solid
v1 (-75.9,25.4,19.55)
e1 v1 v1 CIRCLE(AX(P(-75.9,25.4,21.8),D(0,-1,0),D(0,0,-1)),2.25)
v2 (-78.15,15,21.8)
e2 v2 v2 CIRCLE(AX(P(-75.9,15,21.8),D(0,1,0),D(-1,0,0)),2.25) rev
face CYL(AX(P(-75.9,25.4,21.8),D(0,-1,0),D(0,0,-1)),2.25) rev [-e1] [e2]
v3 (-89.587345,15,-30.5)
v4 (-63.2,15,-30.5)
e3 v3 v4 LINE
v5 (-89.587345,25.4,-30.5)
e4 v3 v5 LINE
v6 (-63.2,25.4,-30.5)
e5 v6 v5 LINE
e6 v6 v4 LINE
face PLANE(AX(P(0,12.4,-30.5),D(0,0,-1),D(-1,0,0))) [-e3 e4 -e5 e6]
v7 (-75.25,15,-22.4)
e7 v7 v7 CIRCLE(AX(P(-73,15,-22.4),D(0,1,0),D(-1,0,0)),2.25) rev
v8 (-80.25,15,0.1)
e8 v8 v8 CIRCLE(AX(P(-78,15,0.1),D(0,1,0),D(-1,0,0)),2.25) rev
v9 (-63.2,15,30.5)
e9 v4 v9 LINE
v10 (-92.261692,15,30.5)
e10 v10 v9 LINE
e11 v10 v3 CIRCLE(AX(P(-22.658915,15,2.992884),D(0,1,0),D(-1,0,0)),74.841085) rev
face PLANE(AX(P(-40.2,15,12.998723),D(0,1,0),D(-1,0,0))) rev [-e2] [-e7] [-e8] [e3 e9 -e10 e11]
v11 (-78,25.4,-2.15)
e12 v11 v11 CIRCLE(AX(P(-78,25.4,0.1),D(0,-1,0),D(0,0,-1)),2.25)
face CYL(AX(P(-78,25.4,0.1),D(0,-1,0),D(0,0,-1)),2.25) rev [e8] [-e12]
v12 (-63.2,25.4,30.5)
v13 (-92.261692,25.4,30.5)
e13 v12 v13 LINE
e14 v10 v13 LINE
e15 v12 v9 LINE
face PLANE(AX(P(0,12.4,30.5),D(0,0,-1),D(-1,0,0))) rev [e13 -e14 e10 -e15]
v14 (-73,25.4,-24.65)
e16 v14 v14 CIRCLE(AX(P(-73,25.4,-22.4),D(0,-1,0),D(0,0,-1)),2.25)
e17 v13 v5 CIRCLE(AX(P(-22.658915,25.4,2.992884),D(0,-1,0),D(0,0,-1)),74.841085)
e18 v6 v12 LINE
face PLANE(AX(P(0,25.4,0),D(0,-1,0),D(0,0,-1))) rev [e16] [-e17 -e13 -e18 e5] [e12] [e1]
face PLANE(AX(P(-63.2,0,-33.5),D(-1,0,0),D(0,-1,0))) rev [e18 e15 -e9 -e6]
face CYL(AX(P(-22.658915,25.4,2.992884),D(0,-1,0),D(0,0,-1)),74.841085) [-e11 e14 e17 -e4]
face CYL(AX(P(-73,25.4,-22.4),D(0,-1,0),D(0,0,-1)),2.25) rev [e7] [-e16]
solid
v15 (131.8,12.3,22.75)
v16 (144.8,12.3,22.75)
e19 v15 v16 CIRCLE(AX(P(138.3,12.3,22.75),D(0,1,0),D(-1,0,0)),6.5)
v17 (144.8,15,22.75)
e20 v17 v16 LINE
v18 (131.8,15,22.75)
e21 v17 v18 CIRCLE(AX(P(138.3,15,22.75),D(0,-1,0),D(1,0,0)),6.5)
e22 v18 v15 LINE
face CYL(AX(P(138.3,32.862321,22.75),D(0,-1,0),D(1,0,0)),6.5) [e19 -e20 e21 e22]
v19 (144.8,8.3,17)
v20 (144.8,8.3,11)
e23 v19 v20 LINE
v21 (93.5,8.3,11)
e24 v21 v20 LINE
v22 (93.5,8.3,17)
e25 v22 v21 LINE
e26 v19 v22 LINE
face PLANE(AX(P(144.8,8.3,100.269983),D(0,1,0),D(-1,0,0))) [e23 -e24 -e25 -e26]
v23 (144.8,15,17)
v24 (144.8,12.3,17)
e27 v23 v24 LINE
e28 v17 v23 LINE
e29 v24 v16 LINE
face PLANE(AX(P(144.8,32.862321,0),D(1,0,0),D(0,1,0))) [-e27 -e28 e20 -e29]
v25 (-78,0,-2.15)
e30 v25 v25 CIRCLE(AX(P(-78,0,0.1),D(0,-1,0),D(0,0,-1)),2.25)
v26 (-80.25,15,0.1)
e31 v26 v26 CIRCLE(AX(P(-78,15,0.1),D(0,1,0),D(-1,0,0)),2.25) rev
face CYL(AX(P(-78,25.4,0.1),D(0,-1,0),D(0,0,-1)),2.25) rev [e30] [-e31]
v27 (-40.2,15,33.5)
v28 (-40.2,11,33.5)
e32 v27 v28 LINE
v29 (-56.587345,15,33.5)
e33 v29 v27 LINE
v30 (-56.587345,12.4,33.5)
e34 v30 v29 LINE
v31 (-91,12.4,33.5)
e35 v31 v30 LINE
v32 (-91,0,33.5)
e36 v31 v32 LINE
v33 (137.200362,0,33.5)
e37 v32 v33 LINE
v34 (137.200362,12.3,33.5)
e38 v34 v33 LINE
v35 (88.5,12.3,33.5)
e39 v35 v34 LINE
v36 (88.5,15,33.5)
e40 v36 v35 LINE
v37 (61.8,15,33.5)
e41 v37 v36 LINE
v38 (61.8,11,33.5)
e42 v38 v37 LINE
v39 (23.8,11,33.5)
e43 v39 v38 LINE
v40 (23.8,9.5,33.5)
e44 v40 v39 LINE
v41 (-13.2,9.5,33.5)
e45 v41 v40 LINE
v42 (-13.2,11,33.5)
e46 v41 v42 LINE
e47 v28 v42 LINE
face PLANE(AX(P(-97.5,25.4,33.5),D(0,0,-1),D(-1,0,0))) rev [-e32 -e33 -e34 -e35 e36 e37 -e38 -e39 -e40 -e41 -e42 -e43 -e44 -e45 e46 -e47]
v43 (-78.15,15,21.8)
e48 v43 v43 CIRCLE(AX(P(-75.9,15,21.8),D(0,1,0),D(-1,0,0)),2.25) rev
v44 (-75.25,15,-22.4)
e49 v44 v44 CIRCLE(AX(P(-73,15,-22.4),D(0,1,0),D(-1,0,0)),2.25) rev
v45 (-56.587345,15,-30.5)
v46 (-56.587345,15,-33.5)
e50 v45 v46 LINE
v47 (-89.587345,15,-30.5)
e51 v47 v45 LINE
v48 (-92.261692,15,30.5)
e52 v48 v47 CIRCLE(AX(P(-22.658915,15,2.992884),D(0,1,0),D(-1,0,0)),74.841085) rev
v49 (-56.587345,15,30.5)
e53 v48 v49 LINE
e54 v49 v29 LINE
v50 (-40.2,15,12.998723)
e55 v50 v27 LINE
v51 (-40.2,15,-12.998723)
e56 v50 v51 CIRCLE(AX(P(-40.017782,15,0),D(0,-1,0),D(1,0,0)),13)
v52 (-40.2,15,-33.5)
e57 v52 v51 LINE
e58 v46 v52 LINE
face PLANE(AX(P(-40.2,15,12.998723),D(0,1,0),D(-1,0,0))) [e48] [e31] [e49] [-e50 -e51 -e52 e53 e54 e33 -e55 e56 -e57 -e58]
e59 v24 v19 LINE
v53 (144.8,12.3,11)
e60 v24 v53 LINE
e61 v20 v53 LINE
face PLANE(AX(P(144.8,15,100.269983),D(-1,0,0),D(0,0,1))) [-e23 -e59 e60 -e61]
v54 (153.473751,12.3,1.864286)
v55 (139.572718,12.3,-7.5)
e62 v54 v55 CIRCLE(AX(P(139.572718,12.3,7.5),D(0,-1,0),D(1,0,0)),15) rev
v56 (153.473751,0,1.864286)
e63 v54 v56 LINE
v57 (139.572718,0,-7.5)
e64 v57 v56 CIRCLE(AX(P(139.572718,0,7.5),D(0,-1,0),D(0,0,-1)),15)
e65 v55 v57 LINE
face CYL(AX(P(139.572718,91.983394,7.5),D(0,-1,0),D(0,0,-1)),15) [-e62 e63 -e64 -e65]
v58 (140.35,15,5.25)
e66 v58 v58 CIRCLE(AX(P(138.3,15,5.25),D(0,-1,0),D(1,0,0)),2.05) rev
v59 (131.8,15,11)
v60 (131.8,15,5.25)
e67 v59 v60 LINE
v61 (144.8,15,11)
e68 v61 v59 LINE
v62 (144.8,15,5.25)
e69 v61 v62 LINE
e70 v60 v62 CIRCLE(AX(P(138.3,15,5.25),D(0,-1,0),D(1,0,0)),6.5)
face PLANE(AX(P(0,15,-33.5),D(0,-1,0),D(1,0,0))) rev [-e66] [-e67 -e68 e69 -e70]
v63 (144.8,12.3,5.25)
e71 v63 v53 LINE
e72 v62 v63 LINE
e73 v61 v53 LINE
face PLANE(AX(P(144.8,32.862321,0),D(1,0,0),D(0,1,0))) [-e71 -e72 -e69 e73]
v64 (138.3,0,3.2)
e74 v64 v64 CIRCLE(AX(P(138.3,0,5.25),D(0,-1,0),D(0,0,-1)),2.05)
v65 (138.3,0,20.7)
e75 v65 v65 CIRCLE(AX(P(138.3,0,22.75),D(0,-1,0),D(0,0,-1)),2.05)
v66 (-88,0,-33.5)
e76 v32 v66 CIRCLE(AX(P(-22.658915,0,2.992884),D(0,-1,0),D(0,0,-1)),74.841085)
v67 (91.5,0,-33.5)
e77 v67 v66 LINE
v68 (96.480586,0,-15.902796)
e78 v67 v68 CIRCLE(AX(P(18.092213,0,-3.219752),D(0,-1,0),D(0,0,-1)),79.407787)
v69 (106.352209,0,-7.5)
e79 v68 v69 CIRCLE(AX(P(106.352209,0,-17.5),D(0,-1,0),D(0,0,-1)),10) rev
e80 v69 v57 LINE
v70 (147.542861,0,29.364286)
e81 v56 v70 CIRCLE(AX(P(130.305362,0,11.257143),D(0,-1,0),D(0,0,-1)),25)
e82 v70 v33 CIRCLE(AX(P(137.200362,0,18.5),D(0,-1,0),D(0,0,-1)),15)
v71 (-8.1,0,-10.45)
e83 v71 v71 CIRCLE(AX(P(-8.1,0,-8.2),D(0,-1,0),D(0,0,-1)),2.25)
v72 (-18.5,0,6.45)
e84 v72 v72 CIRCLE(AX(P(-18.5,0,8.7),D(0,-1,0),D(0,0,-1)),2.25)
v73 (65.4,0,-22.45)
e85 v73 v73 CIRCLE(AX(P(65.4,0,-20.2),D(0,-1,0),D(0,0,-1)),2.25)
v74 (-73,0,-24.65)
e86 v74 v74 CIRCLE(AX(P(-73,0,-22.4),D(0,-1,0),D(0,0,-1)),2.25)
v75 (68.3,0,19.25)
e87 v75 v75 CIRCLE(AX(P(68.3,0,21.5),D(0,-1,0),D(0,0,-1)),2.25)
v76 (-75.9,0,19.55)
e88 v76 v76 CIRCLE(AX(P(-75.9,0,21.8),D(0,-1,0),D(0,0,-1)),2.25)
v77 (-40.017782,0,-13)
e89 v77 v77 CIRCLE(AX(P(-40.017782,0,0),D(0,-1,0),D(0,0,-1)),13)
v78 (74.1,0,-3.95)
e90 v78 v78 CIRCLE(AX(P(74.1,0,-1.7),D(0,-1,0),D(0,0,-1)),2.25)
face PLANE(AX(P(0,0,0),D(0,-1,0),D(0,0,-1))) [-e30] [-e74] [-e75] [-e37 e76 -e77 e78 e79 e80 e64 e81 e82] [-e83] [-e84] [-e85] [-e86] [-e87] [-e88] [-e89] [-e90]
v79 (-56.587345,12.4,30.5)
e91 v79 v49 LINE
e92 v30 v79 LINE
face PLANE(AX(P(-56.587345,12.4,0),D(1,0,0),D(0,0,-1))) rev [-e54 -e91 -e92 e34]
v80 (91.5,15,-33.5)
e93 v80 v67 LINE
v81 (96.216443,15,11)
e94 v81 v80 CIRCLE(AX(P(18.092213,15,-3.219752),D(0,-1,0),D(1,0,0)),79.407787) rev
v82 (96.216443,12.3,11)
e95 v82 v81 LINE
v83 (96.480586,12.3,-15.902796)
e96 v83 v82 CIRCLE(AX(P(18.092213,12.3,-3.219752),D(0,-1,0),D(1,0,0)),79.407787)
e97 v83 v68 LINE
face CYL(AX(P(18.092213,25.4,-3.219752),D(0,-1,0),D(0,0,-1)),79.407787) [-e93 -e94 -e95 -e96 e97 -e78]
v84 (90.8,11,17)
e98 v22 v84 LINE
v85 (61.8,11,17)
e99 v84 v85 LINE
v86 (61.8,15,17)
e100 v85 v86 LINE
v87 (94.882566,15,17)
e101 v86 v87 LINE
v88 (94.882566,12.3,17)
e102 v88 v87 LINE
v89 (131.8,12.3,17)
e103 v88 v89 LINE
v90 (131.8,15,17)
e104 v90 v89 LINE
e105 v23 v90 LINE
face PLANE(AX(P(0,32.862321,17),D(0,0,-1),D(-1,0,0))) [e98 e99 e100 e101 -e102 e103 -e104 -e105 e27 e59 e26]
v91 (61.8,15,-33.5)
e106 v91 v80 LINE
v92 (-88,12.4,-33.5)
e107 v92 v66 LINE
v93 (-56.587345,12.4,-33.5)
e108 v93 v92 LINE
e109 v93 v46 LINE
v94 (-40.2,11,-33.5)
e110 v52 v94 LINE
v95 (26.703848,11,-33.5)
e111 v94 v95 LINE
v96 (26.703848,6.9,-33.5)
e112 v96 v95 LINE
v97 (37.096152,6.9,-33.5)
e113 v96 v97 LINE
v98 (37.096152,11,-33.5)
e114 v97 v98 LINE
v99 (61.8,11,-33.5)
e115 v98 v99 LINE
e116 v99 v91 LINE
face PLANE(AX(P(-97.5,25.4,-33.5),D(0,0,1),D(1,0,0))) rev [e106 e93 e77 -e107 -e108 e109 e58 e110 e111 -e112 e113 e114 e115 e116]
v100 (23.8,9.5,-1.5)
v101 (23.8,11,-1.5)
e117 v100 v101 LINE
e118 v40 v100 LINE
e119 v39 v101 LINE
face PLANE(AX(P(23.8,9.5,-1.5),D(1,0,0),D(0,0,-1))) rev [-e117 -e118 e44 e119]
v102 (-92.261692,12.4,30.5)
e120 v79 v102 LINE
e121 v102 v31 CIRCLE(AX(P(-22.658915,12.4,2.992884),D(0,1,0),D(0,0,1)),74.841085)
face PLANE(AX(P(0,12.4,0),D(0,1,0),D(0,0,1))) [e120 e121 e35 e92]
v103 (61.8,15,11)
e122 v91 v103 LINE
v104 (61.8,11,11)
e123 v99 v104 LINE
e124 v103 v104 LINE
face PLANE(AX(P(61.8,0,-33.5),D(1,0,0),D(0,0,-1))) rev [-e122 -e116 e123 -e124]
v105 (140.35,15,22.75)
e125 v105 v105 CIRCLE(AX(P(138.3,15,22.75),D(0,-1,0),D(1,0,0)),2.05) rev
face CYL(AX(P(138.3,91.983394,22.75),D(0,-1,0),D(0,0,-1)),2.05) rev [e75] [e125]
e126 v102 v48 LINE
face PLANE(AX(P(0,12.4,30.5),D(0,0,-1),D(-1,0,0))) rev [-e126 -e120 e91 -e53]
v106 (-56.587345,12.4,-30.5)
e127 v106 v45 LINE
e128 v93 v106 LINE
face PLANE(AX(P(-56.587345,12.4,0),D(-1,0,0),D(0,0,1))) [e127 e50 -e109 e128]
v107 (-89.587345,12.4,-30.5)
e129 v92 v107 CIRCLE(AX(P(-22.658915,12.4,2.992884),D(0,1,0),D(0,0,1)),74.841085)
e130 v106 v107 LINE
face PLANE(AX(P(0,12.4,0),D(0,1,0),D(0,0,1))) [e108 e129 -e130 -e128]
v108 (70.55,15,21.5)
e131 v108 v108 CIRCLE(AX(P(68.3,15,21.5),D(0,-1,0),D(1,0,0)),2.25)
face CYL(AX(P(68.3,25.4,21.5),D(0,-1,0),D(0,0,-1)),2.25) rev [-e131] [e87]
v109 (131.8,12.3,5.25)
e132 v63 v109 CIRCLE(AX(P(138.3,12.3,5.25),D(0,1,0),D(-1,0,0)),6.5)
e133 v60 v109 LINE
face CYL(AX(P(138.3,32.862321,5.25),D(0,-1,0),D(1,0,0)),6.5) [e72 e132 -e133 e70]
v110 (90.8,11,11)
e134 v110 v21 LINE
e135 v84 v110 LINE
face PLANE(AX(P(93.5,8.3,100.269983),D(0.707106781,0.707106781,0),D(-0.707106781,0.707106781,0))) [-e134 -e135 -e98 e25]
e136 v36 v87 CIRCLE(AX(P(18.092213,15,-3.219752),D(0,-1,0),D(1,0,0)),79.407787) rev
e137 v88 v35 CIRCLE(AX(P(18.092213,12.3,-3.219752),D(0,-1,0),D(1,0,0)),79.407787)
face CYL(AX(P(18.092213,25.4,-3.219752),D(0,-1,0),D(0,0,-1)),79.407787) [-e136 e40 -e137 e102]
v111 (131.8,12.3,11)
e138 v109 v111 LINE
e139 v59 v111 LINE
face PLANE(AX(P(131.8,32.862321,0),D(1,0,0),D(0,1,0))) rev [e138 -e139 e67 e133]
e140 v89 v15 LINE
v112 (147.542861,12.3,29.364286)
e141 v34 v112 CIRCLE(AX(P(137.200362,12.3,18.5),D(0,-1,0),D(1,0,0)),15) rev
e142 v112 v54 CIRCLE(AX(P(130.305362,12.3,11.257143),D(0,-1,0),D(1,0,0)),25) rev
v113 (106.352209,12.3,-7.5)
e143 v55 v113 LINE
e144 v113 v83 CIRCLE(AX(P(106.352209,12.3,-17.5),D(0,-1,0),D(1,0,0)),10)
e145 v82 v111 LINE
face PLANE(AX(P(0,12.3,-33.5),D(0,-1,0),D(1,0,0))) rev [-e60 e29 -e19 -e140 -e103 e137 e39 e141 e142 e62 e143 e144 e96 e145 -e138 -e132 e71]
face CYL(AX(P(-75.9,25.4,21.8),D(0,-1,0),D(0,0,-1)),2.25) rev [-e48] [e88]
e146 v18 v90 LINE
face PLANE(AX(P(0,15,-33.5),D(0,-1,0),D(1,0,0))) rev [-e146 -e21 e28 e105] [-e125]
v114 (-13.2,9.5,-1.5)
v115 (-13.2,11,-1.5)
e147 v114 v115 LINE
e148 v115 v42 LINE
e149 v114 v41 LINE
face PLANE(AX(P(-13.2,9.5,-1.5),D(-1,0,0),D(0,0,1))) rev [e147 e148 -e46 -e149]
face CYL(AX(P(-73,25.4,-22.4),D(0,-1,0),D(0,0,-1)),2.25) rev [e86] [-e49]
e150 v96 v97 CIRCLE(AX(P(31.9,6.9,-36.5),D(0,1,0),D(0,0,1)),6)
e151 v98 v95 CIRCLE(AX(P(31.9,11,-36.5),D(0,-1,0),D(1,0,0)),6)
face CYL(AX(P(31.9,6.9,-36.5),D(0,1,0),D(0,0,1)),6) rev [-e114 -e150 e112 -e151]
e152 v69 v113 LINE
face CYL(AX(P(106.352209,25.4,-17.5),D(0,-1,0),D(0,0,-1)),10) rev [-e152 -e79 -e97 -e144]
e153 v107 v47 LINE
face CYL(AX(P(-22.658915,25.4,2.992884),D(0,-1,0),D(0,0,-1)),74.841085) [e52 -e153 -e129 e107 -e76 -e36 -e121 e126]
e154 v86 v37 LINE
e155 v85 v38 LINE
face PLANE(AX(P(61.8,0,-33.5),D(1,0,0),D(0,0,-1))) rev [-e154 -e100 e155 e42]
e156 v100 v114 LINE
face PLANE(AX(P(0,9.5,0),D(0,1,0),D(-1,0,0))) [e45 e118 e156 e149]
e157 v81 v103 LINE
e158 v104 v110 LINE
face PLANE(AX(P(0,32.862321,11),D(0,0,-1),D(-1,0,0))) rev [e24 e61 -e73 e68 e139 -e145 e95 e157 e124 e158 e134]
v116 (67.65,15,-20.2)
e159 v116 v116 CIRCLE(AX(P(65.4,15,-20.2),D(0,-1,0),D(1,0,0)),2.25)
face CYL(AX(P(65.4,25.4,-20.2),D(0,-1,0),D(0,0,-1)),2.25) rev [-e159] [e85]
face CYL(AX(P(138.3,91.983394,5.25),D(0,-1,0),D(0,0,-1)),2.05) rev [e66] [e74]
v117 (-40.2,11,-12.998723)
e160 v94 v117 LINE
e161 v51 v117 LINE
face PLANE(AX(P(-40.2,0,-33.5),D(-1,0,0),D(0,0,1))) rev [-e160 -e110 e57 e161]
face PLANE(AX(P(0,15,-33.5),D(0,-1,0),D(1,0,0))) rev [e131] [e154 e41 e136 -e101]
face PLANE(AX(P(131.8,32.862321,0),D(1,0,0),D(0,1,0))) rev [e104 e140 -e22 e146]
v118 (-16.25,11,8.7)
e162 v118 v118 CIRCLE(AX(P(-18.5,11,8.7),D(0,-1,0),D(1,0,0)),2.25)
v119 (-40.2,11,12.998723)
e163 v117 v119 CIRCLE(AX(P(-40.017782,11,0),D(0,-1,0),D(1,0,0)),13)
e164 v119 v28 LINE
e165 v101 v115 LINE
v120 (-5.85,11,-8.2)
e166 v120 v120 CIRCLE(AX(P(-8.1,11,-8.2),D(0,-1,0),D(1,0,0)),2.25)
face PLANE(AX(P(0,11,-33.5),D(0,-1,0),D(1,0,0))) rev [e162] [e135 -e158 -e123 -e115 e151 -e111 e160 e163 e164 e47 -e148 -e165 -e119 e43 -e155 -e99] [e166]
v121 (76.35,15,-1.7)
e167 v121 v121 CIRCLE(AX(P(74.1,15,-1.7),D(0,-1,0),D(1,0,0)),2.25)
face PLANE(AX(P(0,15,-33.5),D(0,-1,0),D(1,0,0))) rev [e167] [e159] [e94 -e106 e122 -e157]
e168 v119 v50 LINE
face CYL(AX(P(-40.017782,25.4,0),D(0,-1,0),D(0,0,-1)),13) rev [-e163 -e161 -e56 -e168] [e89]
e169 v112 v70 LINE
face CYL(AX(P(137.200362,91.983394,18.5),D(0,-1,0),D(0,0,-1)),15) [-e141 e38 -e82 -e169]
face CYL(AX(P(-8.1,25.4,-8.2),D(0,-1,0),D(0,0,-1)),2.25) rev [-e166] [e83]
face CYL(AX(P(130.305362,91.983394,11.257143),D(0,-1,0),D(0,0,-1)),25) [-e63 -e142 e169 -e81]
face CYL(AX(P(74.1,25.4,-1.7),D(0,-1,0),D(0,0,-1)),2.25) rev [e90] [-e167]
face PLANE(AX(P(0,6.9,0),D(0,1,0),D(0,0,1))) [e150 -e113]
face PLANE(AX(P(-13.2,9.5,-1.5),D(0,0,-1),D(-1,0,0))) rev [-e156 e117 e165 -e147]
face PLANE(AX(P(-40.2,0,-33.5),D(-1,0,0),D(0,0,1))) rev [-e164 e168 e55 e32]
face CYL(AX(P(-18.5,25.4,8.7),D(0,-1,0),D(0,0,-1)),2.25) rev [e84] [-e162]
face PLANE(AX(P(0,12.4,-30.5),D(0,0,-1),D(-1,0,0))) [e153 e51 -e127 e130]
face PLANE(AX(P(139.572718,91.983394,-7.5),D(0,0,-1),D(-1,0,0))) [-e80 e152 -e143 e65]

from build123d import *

# Parameters (mm, degrees)
SKETCH1_W           = 195
SKETCH1_H           = 67
BOSS_EXTRUDE1_DEPTH = 25.4
CUT_EXTRUDE1_DEPTH  = 107.177492907
CUT_EXTRUDE2_DEPTH  = 121.997561959
CUT_EXTRUDE3_START  = -13
SKETCH4_W           = 6.612655346
SKETCH4_H           = 3
CUT_EXTRUDE3_DEPTH  = 13
SKETCH6_R           = 2.25
CUT_EXTRUDE4_DEPTH  = 107.177492907
SKETCH7_W           = 37
SKETCH7_H           = 35
CUT_EXTRUDE5_DEPTH  = 1.5
CUT_EXTRUDE6_DEPTH  = 18.5
SKETCH9_R           = 2.05
BOSS_EXTRUDE2_DEPTH = 12.3
FILLET1_R           = 10
SKETCH10_R          = 13
CUT_EXTRUDE7_DEPTH  = 161.89488962
SKETCH11_R          = 2.05
BOSS_EXTRUDE3_DEPTH = 2.7
CUT_EXTRUDE8_DEPTH  = 6


# Read off the part's stored shape, not the designer's step: Split1
with BuildPart() as part:
    # Sketch1 → Boss-Extrude1 (new body)
    with BuildSketch(Plane(origin=(0, 0, 0), x_dir=(1, 0, 0), z_dir=(0, 1, 0))):
        Rectangle(SKETCH1_W, SKETCH1_H)
    extrude(amount=BOSS_EXTRUDE1_DEPTH)

    # Sketch2 → Cut-Extrude1 (cut, through all)
    with BuildSketch(Plane.XZ):
        with BuildLine():
            Line((97.5, -3.219751644), (97.5, 33.5))
            Line((97.5, 33.5), (88.5, 33.5))
            ThreePointArc((88.5, 33.5), (95.217186872, 15.683556008), (97.5, -3.219751644))
        make_face()
        with BuildLine():
            Line((97.5, -33.5), (97.5, -3.219751644))
            ThreePointArc((97.5, -3.219751644), (95.985558513, -18.65423771), (91.5, -33.5))
            Line((91.5, -33.5), (97.5, -33.5))
        make_face()
        with BuildLine():
            ThreePointArc((-88, -33.5), (-95.08607052, -15.861694529), (-97.5, 2.992884749))
            Line((-97.5, 2.992884749), (-97.5, -33.5))
            Line((-97.5, -33.5), (-88, -33.5))
        make_face()
        with BuildLine():
            ThreePointArc((-97.5, 2.992884749), (-95.856964648, 18.588830376), (-91, 33.5))
            Line((-91, 33.5), (-97.5, 33.5))
            Line((-97.5, 33.5), (-97.5, 2.992884749))
        make_face()
    extrude(amount=-CUT_EXTRUDE1_DEPTH, mode=Mode.SUBTRACT)

    # Sketch3 → Cut-Extrude2 (cut, through all)
    with BuildSketch(Plane(origin=(0, 0, 33.5), x_dir=(-1, 0, 0), z_dir=(0, 0, -1))):
        Polygon((63.2, 25.4), (63.2, 15), (40.2, 15), (40.2, 11), (-61.8, 11), (-61.8, 15), (-97.5, 15), (-97.5, 25.4), align=None)
    extrude(amount=CUT_EXTRUDE2_DEPTH, mode=Mode.SUBTRACT)

    # Sketch4 → Cut-Extrude3 (cut)
    with BuildSketch(Plane(origin=(0, 25.4, 0), x_dir=(1, 0, 0), z_dir=(0, 1, 0)).offset(CUT_EXTRUDE3_START)):
        with BuildLine():
            Line((-63.2, 30.5), (-63.2, 33.5))
            Line((-63.2, 33.5), (-88, 33.5))
            ThreePointArc((-88, 33.5), (-88.810680862, 32.008999469), (-89.587344654, 30.5))
            Line((-89.587344654, 30.5), (-63.2, 30.5))
        make_face()
        with Locations((-59.893672327, 32)):
            Rectangle(SKETCH4_W, SKETCH4_H)
        with BuildLine():
            Line((-63.2, -33.5), (-63.2, -30.5))
            Line((-63.2, -30.5), (-92.261692194, -30.5))
            ThreePointArc((-92.261692194, -30.5), (-91.647155152, -32.006859002), (-91, -33.5))
            Line((-91, -33.5), (-63.2, -33.5))
        make_face()
        with Locations((-59.893672327, -32)):
            Rectangle(SKETCH4_W, SKETCH4_H)
    extrude(amount=CUT_EXTRUDE3_DEPTH, mode=Mode.SUBTRACT)

    # Sketch6 → Cut-Extrude4 (cut, through all)
    with BuildSketch(Plane.XZ):
        with Locations(Location((-18.5, 8.7, 0), (0, 0, 270))):
            Circle(SKETCH6_R)
        with Locations(Location((74.1, -1.7, 0), (0, 0, 270))):
            Circle(SKETCH6_R)
        with Locations(Location((68.3, 21.5, 0), (0, 0, 270))):
            Circle(SKETCH6_R)
        with Locations(Location((65.4, -20.2, 0), (0, 0, 270))):
            Circle(SKETCH6_R)
        with Locations(Location((-8.1, -8.2, 0), (0, 0, 270))):
            Circle(SKETCH6_R)
        with Locations(Location((-75.9, 21.8, 0), (0, 0, 270))):
            Circle(SKETCH6_R)
        with Locations(Location((-78, 0.1, 0), (0, 0, 270))):
            Circle(SKETCH6_R)
        with Locations(Location((-73, -22.4, 0), (0, 0, 270))):
            Circle(SKETCH6_R)
    extrude(amount=-CUT_EXTRUDE4_DEPTH, mode=Mode.SUBTRACT)

    # Sketch7 → Cut-Extrude5 (cut)
    with BuildSketch(Plane(origin=(0, 11, 0), x_dir=(1, 0, 0), z_dir=(0, 1, 0))):
        with Locations((5.3, -16)):
            Rectangle(SKETCH7_W, SKETCH7_H)
    extrude(amount=-CUT_EXTRUDE5_DEPTH, mode=Mode.SUBTRACT)

    # Sketch8 → Cut-Extrude6 (cut)
    with BuildSketch(Plane(origin=(0, 25.4, 0), x_dir=(1, 0, 0), z_dir=(0, 1, 0))):
        with BuildLine():
            Line((37.096152423, 33.5), (31.9, 33.5))
            Line((31.9, 33.5), (31.9, 30.5))
            ThreePointArc((31.9, 30.5), (34.9, 31.303847577), (37.096152423, 33.5))
        make_face()
        with BuildLine():
            Line((31.9, 33.5), (26.703847577, 33.5))
            ThreePointArc((26.703847577, 33.5), (28.9, 31.303847577), (31.9, 30.5))
            Line((31.9, 30.5), (31.9, 33.5))
        make_face()
    extrude(amount=-CUT_EXTRUDE6_DEPTH, mode=Mode.SUBTRACT)

    # Sketch9 → Boss-Extrude2 (add)
    with BuildSketch(Plane.XZ):
        with BuildLine():
            Line((88.5, 33.5), (137.200361796, 33.5))
            ThreePointArc((137.200361796, 33.5), (142.769729546, 32.427747228), (147.542861296, 29.364285714))
            ThreePointArc((147.542861296, 29.364285714), (154.743476693, 16.527679502), (153.473750823, 1.864285714))
            ThreePointArc((153.473750823, 1.864285714), (147.953179578, -4.940573023), (139.572717606, -7.5))
            Line((139.572717606, -7.5), (97.384558849, -7.5))
            ThreePointArc((97.384558849, -7.5), (95.698800641, 13.597328658), (88.5, 33.5))
        make_face()
        with Locations(Location((138.3, 5.25, 0), (0, 0, 270))):
            Circle(SKETCH9_R, mode=Mode.SUBTRACT)
        with Locations(Location((138.3, 22.75, 0), (0, 0, 270))):
            Circle(SKETCH9_R, mode=Mode.SUBTRACT)
    extrude(amount=-BOSS_EXTRUDE2_DEPTH)

    # Fillet1
    fillet1_edges = [part.edges().sort_by_distance(p)[0] for p in [
        (97.384558849, 6.15, -7.5),
    ]]
    fillet(fillet1_edges, radius=FILLET1_R)

    # Sketch10 → Cut-Extrude7 (cut, through all)
    with BuildSketch(Plane.XZ):
        with Locations(Location((-40.017782272, 0, 0), (0, 0, 270))):
            Circle(SKETCH10_R)
    extrude(amount=-CUT_EXTRUDE7_DEPTH, mode=Mode.SUBTRACT)

    # Sketch11 → Boss-Extrude3 (add)
    # profile 1 of 2: a face of its own
    with BuildSketch(Plane(origin=(0, 12.3, 0), x_dir=(1, 0, 0), z_dir=(0, 1, 0))):
        with BuildLine():
            Line((144.8, -11), (144.8, -5.25))
            ThreePointArc((144.8, -5.25), (138.3, 1.25), (131.8, -5.25))
            Line((131.8, -5.25), (131.8, -11))
            Line((131.8, -11), (144.8, -11))
        make_face()
        with Locations(Location((138.3, -5.25, 0), (0, 0, 90))):
            Circle(SKETCH11_R, mode=Mode.SUBTRACT)
    # profile 2 of 2: a face of its own
    with BuildSketch(Plane(origin=(0, 12.3, 0), x_dir=(1, 0, 0), z_dir=(0, 1, 0))):
        with BuildLine():
            Line((144.8, -22.75), (144.8, -17))
            Line((144.8, -17), (131.8, -17))
            Line((131.8, -17), (131.8, -22.75))
            ThreePointArc((131.8, -22.75), (138.3, -29.25), (144.8, -22.75))
        make_face()
        with Locations(Location((138.3, -22.75, 0), (0, 0, 90))):
            Circle(SKETCH11_R, mode=Mode.SUBTRACT)
    extrude(amount=BOSS_EXTRUDE3_DEPTH)

    # Sketch12 → Cut-Extrude8 (cut)
    with BuildSketch(Plane.XY.offset(11)):
        Polygon((144.8, 15), (144.8, 8.3), (93.5, 8.3), (90.8, 11), (61.8, 11), (61.8, 15), align=None)
    extrude(amount=CUT_EXTRUDE8_DEPTH, mode=Mode.SUBTRACT)


with BuildPart() as body_2:
    # Split1: the piece on the far side of the plane
    add(part.part)
    split(bisect_by=Plane(origin=(0, 15, 0), x_dir=(1, 0, 0), z_dir=(0, 1, 0)), keep=Keep.BOTTOM)


with BuildPart() as part_1:
    add(part.part)

    # Split1
    split(bisect_by=Plane(origin=(0, 15, 0), x_dir=(1, 0, 0), z_dir=(0, 1, 0)), keep=Keep.TOP)


solid = Compound([body_2.part, part_1.part])
